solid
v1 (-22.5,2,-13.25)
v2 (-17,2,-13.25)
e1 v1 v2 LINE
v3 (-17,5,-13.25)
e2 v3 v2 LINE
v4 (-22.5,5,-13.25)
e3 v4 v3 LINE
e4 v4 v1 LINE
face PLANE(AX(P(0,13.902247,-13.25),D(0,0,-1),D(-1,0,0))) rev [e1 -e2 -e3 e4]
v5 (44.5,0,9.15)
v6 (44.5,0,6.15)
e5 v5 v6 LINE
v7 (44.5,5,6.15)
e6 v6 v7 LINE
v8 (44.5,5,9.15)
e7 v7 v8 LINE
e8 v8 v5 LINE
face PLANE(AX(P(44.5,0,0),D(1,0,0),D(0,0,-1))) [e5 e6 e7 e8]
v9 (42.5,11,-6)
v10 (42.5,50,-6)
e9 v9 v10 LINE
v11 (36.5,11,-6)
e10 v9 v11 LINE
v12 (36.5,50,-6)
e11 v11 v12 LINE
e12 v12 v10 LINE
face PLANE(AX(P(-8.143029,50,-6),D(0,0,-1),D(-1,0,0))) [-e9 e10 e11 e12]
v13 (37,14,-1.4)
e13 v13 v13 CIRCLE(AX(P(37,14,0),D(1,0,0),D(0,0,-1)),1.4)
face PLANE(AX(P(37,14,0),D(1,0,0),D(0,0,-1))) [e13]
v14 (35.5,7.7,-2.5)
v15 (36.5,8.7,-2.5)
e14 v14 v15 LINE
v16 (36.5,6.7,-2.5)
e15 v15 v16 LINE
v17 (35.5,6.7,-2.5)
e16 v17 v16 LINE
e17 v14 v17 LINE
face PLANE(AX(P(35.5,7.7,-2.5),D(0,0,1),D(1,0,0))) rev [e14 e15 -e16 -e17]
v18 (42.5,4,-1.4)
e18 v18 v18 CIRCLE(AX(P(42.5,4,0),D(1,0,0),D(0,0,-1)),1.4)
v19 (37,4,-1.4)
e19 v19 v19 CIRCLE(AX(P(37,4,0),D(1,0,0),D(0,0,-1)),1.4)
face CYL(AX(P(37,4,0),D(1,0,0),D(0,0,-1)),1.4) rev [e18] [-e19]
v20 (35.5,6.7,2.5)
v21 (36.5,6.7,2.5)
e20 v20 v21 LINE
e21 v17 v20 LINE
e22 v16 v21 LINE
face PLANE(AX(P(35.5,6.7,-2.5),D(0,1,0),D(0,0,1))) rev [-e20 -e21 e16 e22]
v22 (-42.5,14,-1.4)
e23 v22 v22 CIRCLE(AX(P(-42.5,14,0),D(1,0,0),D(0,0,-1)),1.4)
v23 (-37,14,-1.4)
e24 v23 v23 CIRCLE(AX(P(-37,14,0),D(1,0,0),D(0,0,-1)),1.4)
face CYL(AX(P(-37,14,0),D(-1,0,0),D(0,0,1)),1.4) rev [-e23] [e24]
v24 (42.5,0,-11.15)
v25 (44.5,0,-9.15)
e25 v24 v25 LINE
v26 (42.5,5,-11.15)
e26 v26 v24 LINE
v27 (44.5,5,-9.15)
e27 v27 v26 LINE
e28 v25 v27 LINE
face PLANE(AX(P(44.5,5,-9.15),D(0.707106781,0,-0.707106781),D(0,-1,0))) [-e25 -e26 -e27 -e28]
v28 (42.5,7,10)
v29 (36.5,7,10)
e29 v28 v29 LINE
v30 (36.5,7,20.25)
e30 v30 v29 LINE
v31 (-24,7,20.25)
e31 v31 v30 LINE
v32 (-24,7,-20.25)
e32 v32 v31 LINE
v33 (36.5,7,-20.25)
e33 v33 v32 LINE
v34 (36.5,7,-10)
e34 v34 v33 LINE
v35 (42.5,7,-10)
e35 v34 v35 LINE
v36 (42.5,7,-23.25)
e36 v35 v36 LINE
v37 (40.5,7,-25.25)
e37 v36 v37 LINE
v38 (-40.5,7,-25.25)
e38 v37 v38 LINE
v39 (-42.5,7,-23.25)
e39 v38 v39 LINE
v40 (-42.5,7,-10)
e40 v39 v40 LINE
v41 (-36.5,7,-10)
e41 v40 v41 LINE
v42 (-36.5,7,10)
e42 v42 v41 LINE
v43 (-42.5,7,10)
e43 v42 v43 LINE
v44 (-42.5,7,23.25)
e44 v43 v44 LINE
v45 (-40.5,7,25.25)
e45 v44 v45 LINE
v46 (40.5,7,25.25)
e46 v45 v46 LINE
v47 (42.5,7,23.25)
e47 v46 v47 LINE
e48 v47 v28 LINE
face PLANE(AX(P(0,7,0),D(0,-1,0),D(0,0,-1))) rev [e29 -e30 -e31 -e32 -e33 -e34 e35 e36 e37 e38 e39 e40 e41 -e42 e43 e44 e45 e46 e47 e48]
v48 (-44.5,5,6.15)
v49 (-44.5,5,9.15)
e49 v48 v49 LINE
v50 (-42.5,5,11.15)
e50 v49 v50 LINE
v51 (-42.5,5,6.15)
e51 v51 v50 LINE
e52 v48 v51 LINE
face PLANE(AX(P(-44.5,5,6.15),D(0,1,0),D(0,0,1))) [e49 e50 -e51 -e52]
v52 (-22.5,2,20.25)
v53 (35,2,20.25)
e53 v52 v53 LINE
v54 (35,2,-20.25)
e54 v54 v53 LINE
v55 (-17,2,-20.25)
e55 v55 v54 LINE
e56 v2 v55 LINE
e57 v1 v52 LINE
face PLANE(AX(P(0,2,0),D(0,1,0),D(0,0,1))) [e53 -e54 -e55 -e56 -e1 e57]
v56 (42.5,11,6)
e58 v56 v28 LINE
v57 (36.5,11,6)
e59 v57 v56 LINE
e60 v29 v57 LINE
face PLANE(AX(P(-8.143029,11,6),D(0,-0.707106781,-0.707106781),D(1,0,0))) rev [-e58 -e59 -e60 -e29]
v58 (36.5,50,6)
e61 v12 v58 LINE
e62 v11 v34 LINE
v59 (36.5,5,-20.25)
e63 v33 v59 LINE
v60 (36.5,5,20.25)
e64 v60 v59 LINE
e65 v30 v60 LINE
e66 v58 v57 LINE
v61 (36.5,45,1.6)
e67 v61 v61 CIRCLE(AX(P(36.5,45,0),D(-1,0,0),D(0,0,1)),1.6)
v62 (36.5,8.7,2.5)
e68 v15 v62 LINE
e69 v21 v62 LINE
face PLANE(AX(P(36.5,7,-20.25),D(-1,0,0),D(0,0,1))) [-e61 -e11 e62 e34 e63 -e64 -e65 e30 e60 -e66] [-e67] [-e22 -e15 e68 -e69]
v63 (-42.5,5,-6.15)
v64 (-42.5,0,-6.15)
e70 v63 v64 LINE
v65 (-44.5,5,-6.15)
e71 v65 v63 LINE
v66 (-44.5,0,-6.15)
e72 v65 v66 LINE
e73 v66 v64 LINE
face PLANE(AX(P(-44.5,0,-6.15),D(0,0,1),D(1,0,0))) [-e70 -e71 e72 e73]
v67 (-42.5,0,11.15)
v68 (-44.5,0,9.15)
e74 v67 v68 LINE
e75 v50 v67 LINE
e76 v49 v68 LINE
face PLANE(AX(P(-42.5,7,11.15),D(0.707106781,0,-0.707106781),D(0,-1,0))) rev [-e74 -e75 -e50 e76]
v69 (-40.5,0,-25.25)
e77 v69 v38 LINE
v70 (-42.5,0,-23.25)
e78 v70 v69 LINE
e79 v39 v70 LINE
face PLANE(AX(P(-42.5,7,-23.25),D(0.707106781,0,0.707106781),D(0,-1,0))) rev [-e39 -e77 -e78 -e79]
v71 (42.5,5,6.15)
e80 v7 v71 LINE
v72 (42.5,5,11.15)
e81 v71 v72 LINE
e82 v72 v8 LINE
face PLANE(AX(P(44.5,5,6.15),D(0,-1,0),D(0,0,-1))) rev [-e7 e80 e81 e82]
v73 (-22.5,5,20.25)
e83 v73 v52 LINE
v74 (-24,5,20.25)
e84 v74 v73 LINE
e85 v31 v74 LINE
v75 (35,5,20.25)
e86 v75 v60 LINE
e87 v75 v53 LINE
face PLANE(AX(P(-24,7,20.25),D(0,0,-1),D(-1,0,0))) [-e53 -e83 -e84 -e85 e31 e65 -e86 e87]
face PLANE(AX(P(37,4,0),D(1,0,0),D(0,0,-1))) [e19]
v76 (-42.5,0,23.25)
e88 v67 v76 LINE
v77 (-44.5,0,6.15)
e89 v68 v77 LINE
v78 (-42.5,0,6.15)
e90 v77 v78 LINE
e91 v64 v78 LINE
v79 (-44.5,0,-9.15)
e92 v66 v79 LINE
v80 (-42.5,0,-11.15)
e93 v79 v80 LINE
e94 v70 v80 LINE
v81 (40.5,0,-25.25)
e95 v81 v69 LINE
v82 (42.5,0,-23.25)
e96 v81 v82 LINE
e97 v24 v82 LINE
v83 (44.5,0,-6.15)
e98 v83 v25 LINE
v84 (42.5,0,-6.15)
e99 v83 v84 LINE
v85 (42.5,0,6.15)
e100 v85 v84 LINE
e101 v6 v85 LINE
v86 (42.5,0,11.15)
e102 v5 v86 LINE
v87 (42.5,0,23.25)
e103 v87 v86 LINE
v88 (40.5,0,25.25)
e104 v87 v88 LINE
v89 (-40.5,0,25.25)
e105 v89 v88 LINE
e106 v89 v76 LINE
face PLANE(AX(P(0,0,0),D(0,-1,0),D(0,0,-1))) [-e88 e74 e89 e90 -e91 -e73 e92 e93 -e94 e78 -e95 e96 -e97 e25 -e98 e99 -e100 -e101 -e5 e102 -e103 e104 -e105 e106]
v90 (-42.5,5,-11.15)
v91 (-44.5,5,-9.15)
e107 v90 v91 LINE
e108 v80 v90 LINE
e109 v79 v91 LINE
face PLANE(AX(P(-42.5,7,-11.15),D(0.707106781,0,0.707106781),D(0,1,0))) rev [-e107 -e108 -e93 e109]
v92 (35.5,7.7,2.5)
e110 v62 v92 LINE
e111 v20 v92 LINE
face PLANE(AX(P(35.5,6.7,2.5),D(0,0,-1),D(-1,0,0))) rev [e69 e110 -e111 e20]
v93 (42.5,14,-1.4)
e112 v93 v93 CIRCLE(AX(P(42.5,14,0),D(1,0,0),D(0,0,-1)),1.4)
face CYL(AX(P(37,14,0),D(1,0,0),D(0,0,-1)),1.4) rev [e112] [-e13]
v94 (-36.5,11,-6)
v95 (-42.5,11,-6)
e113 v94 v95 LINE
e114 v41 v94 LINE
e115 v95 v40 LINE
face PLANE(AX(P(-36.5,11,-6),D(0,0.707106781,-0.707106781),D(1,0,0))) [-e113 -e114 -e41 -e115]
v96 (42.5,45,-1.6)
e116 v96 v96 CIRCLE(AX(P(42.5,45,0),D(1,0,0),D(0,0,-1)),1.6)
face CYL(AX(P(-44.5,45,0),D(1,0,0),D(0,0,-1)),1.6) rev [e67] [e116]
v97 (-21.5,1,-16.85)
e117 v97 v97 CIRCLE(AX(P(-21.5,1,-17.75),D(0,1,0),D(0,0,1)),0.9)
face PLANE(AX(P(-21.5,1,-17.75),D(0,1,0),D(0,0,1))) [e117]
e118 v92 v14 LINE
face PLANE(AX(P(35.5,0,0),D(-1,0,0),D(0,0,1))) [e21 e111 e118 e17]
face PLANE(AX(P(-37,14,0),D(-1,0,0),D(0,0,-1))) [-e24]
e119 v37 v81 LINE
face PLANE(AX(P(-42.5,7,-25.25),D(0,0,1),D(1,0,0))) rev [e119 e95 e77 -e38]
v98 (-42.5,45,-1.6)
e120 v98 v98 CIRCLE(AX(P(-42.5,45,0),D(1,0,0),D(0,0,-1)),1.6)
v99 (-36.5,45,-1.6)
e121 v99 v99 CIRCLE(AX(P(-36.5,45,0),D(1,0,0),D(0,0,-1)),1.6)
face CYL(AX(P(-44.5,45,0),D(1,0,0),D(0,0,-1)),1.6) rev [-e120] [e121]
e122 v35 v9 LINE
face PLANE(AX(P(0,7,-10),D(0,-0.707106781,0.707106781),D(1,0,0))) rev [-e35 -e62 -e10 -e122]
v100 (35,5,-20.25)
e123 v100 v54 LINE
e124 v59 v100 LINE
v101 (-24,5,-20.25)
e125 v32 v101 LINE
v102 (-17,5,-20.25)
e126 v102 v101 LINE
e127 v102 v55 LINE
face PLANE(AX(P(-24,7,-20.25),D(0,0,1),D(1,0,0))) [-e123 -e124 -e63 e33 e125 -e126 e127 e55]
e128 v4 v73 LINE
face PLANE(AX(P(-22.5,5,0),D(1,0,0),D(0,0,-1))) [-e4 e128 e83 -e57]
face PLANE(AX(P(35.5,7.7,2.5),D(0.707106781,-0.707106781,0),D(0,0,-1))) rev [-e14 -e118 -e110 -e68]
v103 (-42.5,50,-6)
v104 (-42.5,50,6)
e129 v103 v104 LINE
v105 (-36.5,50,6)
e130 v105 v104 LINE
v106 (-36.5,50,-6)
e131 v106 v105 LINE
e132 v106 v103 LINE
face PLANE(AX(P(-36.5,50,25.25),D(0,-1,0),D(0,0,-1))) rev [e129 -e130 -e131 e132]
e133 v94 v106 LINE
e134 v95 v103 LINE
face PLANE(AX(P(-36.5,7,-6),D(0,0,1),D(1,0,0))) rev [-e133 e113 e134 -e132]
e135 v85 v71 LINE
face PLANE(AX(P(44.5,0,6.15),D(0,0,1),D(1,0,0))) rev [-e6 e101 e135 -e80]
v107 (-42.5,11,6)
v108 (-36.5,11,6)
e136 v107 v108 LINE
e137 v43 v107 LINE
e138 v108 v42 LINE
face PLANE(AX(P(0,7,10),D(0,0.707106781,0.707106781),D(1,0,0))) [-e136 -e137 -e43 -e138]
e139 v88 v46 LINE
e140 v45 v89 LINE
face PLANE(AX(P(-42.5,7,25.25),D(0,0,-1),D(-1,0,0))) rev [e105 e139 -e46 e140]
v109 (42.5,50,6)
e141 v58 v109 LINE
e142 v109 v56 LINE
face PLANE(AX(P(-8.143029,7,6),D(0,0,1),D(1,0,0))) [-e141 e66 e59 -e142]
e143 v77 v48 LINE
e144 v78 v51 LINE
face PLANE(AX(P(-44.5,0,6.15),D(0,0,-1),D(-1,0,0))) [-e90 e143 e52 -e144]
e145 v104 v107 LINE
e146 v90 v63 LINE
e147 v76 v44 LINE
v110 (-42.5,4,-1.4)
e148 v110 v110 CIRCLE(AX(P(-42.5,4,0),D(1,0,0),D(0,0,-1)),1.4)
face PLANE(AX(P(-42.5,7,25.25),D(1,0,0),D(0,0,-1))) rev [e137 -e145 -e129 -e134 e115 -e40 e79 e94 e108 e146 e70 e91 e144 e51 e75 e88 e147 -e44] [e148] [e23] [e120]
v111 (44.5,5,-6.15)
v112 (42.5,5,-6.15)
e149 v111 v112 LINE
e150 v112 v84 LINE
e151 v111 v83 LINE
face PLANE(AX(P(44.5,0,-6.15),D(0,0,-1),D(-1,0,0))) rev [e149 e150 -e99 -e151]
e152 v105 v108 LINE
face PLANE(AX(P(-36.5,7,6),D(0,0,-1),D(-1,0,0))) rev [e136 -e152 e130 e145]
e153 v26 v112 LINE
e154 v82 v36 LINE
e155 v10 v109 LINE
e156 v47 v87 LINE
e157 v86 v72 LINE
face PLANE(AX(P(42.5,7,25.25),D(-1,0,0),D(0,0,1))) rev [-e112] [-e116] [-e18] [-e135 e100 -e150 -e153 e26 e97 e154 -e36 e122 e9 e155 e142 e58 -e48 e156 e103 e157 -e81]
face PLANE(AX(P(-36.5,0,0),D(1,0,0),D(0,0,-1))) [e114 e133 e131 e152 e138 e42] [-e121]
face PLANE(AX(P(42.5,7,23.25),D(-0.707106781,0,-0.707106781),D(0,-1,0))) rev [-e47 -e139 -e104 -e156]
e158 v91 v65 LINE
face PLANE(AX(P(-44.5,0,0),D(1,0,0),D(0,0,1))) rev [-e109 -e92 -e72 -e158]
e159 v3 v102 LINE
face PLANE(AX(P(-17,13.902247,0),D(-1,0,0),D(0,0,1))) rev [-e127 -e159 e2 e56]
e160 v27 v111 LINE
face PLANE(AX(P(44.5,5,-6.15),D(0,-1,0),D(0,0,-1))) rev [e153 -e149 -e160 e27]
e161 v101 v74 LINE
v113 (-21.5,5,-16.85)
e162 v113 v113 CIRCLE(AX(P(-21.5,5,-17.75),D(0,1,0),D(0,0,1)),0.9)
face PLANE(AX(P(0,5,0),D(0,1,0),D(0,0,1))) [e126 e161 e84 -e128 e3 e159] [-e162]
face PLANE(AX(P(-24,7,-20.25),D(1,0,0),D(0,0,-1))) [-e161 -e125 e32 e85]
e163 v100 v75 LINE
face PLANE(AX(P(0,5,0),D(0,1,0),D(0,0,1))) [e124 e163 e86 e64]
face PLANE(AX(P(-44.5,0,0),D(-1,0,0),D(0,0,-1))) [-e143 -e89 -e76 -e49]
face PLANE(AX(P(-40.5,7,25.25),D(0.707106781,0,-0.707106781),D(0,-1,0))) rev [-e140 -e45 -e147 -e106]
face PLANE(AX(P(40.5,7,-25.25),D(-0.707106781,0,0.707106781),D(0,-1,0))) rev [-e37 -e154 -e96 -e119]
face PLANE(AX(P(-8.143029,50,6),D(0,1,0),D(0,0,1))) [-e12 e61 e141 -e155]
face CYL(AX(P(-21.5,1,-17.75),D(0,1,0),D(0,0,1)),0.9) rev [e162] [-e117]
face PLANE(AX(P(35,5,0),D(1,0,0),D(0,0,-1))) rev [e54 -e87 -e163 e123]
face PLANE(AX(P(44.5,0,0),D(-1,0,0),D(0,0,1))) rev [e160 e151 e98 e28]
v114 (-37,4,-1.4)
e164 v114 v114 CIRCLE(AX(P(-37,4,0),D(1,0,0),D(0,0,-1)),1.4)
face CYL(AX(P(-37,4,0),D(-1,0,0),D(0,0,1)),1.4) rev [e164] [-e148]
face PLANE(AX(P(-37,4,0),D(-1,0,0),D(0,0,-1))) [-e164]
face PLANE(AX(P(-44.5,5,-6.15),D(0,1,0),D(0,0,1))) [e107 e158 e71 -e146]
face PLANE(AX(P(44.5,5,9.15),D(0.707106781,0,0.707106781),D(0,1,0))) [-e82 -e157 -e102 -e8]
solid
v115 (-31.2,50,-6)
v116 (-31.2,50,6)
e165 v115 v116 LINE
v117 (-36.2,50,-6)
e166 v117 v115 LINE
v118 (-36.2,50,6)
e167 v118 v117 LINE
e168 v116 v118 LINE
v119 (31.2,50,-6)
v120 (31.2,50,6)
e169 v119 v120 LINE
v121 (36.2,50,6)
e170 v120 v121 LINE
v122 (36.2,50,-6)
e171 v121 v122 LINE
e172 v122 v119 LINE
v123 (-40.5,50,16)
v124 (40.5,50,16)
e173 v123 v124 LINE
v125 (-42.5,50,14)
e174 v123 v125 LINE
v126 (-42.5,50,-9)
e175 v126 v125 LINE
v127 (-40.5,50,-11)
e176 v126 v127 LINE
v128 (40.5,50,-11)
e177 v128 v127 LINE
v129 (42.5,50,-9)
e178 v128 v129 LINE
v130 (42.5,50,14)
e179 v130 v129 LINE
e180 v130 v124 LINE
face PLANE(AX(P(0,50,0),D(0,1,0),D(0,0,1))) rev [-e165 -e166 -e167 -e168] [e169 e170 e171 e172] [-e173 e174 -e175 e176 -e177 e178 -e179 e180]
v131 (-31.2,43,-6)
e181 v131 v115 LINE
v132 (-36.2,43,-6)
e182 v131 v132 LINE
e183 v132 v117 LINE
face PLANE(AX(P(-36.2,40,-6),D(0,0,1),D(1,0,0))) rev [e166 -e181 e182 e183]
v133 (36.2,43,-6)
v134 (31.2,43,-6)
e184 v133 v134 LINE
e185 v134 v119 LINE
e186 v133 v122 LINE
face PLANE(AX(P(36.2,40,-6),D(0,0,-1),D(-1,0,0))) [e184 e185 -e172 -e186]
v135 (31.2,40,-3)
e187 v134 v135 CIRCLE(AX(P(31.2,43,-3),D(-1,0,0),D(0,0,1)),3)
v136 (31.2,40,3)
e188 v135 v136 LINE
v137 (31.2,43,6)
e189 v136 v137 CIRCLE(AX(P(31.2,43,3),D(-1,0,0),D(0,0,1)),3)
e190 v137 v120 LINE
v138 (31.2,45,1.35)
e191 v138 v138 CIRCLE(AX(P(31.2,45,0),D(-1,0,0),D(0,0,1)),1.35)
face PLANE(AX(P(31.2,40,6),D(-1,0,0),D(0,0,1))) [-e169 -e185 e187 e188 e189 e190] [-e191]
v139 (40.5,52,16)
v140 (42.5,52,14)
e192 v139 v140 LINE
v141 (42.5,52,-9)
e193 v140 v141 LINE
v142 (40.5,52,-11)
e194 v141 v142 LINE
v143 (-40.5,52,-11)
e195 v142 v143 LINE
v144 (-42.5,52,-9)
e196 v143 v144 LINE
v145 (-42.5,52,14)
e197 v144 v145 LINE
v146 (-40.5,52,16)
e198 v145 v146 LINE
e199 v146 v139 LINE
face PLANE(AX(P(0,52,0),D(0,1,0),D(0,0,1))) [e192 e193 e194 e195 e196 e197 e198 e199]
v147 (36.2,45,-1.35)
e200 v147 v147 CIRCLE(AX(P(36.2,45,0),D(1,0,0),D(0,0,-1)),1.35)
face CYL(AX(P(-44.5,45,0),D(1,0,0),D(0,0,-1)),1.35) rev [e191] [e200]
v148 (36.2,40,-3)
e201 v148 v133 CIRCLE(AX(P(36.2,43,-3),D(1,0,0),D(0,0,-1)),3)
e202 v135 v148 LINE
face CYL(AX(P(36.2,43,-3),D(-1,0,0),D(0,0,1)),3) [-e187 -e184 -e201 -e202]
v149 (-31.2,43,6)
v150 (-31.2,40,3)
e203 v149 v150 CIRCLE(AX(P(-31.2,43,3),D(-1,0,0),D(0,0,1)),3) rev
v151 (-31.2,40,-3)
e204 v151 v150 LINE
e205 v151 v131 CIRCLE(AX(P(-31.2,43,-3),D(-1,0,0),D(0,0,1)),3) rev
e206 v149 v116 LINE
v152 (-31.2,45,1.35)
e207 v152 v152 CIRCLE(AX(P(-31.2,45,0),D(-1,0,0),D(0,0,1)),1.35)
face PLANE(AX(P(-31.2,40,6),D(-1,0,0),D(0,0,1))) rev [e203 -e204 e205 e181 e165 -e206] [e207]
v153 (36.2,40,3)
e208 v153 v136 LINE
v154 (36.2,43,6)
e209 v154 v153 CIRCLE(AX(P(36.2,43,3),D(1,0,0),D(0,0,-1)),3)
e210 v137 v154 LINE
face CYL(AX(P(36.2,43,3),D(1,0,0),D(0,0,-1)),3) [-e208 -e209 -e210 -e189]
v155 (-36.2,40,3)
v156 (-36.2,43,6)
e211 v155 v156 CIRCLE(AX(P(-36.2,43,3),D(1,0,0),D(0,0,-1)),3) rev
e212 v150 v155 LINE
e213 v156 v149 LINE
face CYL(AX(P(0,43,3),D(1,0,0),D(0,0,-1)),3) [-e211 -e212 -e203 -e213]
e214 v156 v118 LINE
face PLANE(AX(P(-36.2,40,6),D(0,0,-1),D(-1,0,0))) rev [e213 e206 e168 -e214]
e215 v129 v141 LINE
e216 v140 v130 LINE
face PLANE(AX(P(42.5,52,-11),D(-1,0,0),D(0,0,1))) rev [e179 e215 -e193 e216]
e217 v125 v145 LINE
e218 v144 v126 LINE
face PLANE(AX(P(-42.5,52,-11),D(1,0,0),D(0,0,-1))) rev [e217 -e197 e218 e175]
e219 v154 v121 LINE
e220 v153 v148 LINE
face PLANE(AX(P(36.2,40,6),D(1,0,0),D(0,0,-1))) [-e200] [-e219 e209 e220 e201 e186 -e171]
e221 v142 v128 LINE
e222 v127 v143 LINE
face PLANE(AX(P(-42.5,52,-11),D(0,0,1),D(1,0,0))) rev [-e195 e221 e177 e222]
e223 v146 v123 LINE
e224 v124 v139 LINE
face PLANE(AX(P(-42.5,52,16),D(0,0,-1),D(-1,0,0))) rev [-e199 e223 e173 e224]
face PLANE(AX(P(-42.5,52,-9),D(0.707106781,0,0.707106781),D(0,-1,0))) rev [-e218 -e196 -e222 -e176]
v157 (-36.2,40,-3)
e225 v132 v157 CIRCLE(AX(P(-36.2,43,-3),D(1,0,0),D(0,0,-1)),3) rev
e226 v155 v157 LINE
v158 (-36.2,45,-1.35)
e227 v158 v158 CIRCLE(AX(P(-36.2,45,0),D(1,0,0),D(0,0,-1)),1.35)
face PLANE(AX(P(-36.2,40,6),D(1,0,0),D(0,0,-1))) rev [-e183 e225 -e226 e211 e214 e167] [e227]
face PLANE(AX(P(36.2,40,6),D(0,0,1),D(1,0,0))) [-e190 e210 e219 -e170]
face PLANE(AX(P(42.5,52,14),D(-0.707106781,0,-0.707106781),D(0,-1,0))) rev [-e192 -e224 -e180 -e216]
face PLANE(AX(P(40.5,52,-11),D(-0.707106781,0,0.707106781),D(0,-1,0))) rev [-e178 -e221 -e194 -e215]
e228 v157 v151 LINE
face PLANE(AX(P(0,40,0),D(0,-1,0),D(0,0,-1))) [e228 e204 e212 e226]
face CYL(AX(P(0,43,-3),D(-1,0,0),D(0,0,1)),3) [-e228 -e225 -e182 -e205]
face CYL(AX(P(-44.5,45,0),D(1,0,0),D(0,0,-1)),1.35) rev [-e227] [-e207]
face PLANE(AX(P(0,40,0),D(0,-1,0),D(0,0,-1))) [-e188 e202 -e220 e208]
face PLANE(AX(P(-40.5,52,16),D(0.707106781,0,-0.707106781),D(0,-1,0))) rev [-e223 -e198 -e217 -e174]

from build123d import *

# Parameters (mm, degrees)
SCHIZZO1_W                    = 85
SCHIZZO1_H                    = 50.5
SCHIZZO1_W_2                  = 60.5
SCHIZZO1_H_2                  = 40.5
ESTRUSIONE_ESTRUSIONE1_DEPTH  = 7
SCHIZZO1_3_W                  = 60.5
SCHIZZO1_3_H                  = 40.5
ESTRUSIONE_ESTRUSIONE2_DEPTH  = 2
SCHIZZO3_W                    = 1.5
SCHIZZO3_H                    = 40.5
ESTRUSIONE_ESTRUSIONE3_DEPTH  = 3
SCHIZZO4_W                    = 12
SCHIZZO4_H                    = 43
ESTRUSIONE_ESTRUSIONE4_DEPTH  = 6
ESTRUSIONE_ESTRUSIONE5_START  = -85
SCHIZZO4_2_W                  = 12
SCHIZZO4_2_H                  = 43
ESTRUSIONE_ESTRUSIONE5_DEPTH  = 6
SCHIZZO5_R                    = 1.4
TAGLIO_ESTRUSIONE1_DEPTH      = 5.5
SMUSSO1_SIZE                  = 4
SCHIZZO7_W                    = 3
SCHIZZO7_H                    = 5
ESTRUSIONE_ESTRUSIONE6_DEPTH  = 2
SMUSSO2_SIZE                  = 2
SMUSSO3_SIZE                  = 2
SCHIZZO8_W                    = 5
SCHIZZO8_H                    = 1
ESTRUSIONE_ESTRUSIONE7_DEPTH  = 1
SMUSSO4_SIZE                  = 1
SCHIZZO9_W                    = 5.5
SCHIZZO9_H                    = 7
ESTRUSIONE_ESTRUSIONE8_DEPTH  = 3
SCHIZZO10_R                   = 0.9
TAGLIO_ESTRUSIONE2_DEPTH      = 4
SCHIZZO11_R                   = 1.6
TAGLIO_ESTRUSIONE3_DEPTH      = 104.472520507
SCHIZZO13_W                   = 85
SCHIZZO13_H                   = 27
ESTRUSIONE_ESTRUSIONE10_DEPTH = 2
SCHIZZO15_W                   = 5
SCHIZZO15_H                   = 12
ESTRUSIONE_ESTRUSIONE11_DEPTH = 10
SCHIZZO16_R                   = 1.35
TAGLIO_ESTRUSIONE4_DEPTH      = 100.267580307
RACCORDO1_R                   = 3
SMUSSO5_SIZE                  = 2


with BuildPart() as part:
    # Schizzo1 → Estrusione-Estrusione1 (new body)
    with BuildSketch(Plane(origin=(0, 0, 0), x_dir=(1, 0, 0), z_dir=(0, 1, 0))):
        Rectangle(SCHIZZO1_W, SCHIZZO1_H)
        with Locations((6.25, 0)):
            Rectangle(SCHIZZO1_W_2, SCHIZZO1_H_2, mode=Mode.SUBTRACT)
    extrude(amount=ESTRUSIONE_ESTRUSIONE1_DEPTH)

    # Schizzo1<3> → Estrusione-Estrusione2 (add)
    with BuildSketch(Plane(origin=(0, 0, 0), x_dir=(1, 0, 0), z_dir=(0, 1, 0))):
        with Locations((6.25, 0)):
            Rectangle(SCHIZZO1_3_W, SCHIZZO1_3_H)
    extrude(amount=ESTRUSIONE_ESTRUSIONE2_DEPTH)

    # Schizzo3 → Estrusione-Estrusione3 (add)
    with BuildSketch(Plane(origin=(0, 2, 0), x_dir=(1, 0, 0), z_dir=(0, 1, 0))):
        with Locations((-23.25, 0)):
            Rectangle(SCHIZZO3_W, SCHIZZO3_H)
        with Locations((35.75, 0)):
            Rectangle(SCHIZZO3_W, SCHIZZO3_H)
    extrude(amount=ESTRUSIONE_ESTRUSIONE3_DEPTH)

    # Schizzo4 → Estrusione-Estrusione4 (add)
    with BuildSketch(Plane(origin=(42.5, 0, 0), x_dir=(0, 0, -1), z_dir=(1, 0, 0))):
        with Locations((0, 28.5)):
            Rectangle(SCHIZZO4_W, SCHIZZO4_H)
    extrude(amount=-ESTRUSIONE_ESTRUSIONE4_DEPTH)

    # Schizzo4<2> → Estrusione-Estrusione5 (add)
    with BuildSketch(Plane(origin=(42.5, 0, 0), x_dir=(0, 0, -1), z_dir=(1, 0, 0)).offset(ESTRUSIONE_ESTRUSIONE5_START)):
        with Locations((0, 28.5)):
            Rectangle(SCHIZZO4_2_W, SCHIZZO4_2_H)
    extrude(amount=ESTRUSIONE_ESTRUSIONE5_DEPTH)

    # Schizzo5 → Taglio-Estrusione1 (cut)
    with BuildSketch(Plane(origin=(42.5, 0, 0), x_dir=(0, 0, -1), z_dir=(1, 0, 0))):
        with Locations((0, 4)):
            Circle(SCHIZZO5_R)
        with Locations((0, 14)):
            Circle(SCHIZZO5_R)
    taglio_estrusione1 = extrude(amount=-TAGLIO_ESTRUSIONE1_DEPTH, mode=Mode.SUBTRACT)

    # Specchia1: Taglio-Estrusione1 across plane
    add(taglio_estrusione1.mirror(Plane(origin=(0, 0, 0), x_dir=(0, 0, 1), z_dir=(1, 0, 0))), mode=Mode.SUBTRACT)

    # Smusso1
    smusso1_edges = [part.edges().sort_by_distance(p)[0] for p in [
        (39.5, 7, -6),
        (39.5, 7, 6),
        (-39.5, 7, 6),
        (-39.5, 7, -6),
    ]]
    chamfer(smusso1_edges, length=SMUSSO1_SIZE)

    # Schizzo7 → Estrusione-Estrusione6 (add)
    with BuildSketch(Plane(origin=(42.5, 0, 0), x_dir=(0, 0, -1), z_dir=(1, 0, 0))):
        with Locations((-7.65, 2.5)):
            Rectangle(SCHIZZO7_W, SCHIZZO7_H)
        with Locations((7.65, 2.5)):
            Rectangle(SCHIZZO7_W, SCHIZZO7_H)
    estrusione_estrusione6 = extrude(amount=ESTRUSIONE_ESTRUSIONE6_DEPTH)

    # Specchia2: Estrusione-Estrusione6 across plane
    add(estrusione_estrusione6.mirror(Plane(origin=(0, 0, 0), x_dir=(0, 0, 1), z_dir=(1, 0, 0))))

    # Smusso2
    smusso2_edges = [part.edges().sort_by_distance(p)[0] for p in [
        (42.5, 2.5, -9.15),
        (42.5, 2.5, 9.15),
        (-42.5, 2.5, -9.15),
        (-42.5, 2.5, 9.15),
    ]]
    chamfer(smusso2_edges, length=SMUSSO2_SIZE - 0.0001)  # a hair under: the kernel refuses the full size

    # Smusso3
    smusso3_edges = [part.edges().sort_by_distance(p)[0] for p in [
        (42.5, 3.5, 25.25),
        (-42.5, 3.5, 25.25),
        (-42.5, 3.5, -25.25),
        (42.5, 3.5, -25.25),
    ]]
    chamfer(smusso3_edges, length=SMUSSO3_SIZE)

    # Schizzo8 → Estrusione-Estrusione7 (add)
    with BuildSketch(Plane.ZY.offset(-36.5)):
        with Locations((0, 7.2)):
            Rectangle(SCHIZZO8_W, SCHIZZO8_H)
    extrude(amount=ESTRUSIONE_ESTRUSIONE7_DEPTH)

    # Smusso4
    smusso4_edges = [part.edges().sort_by_distance(p)[0] for p in [
        (36.5, 7.7, 0),
    ]]
    chamfer(smusso4_edges, length=SMUSSO4_SIZE - 0.0001)  # a hair under: the kernel refuses the full size

    # Schizzo9 → Estrusione-Estrusione8 (add)
    with BuildSketch(Plane(origin=(0, 2, 0), x_dir=(1, 0, 0), z_dir=(0, 1, 0))):
        with Locations((-19.75, 16.75)):
            Rectangle(SCHIZZO9_W, SCHIZZO9_H)
    extrude(amount=ESTRUSIONE_ESTRUSIONE8_DEPTH)

    # Schizzo10 → Taglio-Estrusione2 (cut)
    with BuildSketch(Plane(origin=(0, 5, 0), x_dir=(1, 0, 0), z_dir=(0, 1, 0))):
        with Locations(Location((-21.5, 17.75, 0), (0, 0, 270))):
            Circle(SCHIZZO10_R)
    extrude(amount=-TAGLIO_ESTRUSIONE2_DEPTH, mode=Mode.SUBTRACT)

    # Schizzo11 → Taglio-Estrusione3 (cut, through all)
    with BuildSketch(Plane(origin=(42.5, 0, 0), x_dir=(0, 0, -1), z_dir=(1, 0, 0))):
        with Locations((0, 45)):
            Circle(SCHIZZO11_R)
    extrude(amount=-TAGLIO_ESTRUSIONE3_DEPTH, mode=Mode.SUBTRACT)


with BuildPart() as body_2:
    # Schizzo13 → Estrusione-Estrusione10 (new body)
    with BuildSketch(Plane(origin=(0, 50, 0), x_dir=(1, 0, 0), z_dir=(0, 1, 0))):
        with Locations((0, -2.5)):
            Rectangle(SCHIZZO13_W, SCHIZZO13_H)
    extrude(amount=ESTRUSIONE_ESTRUSIONE10_DEPTH)

    # Schizzo15 → Estrusione-Estrusione11 (add)
    with BuildSketch(Plane.XZ.offset(-50)):
        with Locations((-33.7, 0)):
            Rectangle(SCHIZZO15_W, SCHIZZO15_H)
    estrusione_estrusione11 = extrude(amount=ESTRUSIONE_ESTRUSIONE11_DEPTH)

    # Specchia4: Estrusione-Estrusione11 across plane
    add(estrusione_estrusione11.mirror(Plane(origin=(0, 0, 0), x_dir=(0, 0, 1), z_dir=(1, 0, 0))))

    # Schizzo16 → Taglio-Estrusione4 (cut, through all)
    with BuildSketch(Plane(origin=(36.2, 0, 0), x_dir=(0, 0, -1), z_dir=(1, 0, 0))):
        with Locations((0, 45)):
            Circle(SCHIZZO16_R)
    extrude(amount=-TAGLIO_ESTRUSIONE4_DEPTH, mode=Mode.SUBTRACT)

    # Raccordo1
    raccordo1_edges = [body_2.edges().sort_by_distance(p)[0] for p in [
        (-33.7, 40, -6),
        (-33.7, 40, 6),
        (33.7, 40, 6),
        (33.7, 40, -6),
    ]]
    fillet(raccordo1_edges, radius=RACCORDO1_R)

    # Smusso5
    smusso5_edges = [body_2.edges().sort_by_distance(p)[0] for p in [
        (-42.5, 51, -11),
        (42.5, 51, -11),
        (42.5, 51, 16),
        (-42.5, 51, 16),
    ]]
    chamfer(smusso5_edges, length=SMUSSO5_SIZE)


solid = Compound([part.part, body_2.part])
